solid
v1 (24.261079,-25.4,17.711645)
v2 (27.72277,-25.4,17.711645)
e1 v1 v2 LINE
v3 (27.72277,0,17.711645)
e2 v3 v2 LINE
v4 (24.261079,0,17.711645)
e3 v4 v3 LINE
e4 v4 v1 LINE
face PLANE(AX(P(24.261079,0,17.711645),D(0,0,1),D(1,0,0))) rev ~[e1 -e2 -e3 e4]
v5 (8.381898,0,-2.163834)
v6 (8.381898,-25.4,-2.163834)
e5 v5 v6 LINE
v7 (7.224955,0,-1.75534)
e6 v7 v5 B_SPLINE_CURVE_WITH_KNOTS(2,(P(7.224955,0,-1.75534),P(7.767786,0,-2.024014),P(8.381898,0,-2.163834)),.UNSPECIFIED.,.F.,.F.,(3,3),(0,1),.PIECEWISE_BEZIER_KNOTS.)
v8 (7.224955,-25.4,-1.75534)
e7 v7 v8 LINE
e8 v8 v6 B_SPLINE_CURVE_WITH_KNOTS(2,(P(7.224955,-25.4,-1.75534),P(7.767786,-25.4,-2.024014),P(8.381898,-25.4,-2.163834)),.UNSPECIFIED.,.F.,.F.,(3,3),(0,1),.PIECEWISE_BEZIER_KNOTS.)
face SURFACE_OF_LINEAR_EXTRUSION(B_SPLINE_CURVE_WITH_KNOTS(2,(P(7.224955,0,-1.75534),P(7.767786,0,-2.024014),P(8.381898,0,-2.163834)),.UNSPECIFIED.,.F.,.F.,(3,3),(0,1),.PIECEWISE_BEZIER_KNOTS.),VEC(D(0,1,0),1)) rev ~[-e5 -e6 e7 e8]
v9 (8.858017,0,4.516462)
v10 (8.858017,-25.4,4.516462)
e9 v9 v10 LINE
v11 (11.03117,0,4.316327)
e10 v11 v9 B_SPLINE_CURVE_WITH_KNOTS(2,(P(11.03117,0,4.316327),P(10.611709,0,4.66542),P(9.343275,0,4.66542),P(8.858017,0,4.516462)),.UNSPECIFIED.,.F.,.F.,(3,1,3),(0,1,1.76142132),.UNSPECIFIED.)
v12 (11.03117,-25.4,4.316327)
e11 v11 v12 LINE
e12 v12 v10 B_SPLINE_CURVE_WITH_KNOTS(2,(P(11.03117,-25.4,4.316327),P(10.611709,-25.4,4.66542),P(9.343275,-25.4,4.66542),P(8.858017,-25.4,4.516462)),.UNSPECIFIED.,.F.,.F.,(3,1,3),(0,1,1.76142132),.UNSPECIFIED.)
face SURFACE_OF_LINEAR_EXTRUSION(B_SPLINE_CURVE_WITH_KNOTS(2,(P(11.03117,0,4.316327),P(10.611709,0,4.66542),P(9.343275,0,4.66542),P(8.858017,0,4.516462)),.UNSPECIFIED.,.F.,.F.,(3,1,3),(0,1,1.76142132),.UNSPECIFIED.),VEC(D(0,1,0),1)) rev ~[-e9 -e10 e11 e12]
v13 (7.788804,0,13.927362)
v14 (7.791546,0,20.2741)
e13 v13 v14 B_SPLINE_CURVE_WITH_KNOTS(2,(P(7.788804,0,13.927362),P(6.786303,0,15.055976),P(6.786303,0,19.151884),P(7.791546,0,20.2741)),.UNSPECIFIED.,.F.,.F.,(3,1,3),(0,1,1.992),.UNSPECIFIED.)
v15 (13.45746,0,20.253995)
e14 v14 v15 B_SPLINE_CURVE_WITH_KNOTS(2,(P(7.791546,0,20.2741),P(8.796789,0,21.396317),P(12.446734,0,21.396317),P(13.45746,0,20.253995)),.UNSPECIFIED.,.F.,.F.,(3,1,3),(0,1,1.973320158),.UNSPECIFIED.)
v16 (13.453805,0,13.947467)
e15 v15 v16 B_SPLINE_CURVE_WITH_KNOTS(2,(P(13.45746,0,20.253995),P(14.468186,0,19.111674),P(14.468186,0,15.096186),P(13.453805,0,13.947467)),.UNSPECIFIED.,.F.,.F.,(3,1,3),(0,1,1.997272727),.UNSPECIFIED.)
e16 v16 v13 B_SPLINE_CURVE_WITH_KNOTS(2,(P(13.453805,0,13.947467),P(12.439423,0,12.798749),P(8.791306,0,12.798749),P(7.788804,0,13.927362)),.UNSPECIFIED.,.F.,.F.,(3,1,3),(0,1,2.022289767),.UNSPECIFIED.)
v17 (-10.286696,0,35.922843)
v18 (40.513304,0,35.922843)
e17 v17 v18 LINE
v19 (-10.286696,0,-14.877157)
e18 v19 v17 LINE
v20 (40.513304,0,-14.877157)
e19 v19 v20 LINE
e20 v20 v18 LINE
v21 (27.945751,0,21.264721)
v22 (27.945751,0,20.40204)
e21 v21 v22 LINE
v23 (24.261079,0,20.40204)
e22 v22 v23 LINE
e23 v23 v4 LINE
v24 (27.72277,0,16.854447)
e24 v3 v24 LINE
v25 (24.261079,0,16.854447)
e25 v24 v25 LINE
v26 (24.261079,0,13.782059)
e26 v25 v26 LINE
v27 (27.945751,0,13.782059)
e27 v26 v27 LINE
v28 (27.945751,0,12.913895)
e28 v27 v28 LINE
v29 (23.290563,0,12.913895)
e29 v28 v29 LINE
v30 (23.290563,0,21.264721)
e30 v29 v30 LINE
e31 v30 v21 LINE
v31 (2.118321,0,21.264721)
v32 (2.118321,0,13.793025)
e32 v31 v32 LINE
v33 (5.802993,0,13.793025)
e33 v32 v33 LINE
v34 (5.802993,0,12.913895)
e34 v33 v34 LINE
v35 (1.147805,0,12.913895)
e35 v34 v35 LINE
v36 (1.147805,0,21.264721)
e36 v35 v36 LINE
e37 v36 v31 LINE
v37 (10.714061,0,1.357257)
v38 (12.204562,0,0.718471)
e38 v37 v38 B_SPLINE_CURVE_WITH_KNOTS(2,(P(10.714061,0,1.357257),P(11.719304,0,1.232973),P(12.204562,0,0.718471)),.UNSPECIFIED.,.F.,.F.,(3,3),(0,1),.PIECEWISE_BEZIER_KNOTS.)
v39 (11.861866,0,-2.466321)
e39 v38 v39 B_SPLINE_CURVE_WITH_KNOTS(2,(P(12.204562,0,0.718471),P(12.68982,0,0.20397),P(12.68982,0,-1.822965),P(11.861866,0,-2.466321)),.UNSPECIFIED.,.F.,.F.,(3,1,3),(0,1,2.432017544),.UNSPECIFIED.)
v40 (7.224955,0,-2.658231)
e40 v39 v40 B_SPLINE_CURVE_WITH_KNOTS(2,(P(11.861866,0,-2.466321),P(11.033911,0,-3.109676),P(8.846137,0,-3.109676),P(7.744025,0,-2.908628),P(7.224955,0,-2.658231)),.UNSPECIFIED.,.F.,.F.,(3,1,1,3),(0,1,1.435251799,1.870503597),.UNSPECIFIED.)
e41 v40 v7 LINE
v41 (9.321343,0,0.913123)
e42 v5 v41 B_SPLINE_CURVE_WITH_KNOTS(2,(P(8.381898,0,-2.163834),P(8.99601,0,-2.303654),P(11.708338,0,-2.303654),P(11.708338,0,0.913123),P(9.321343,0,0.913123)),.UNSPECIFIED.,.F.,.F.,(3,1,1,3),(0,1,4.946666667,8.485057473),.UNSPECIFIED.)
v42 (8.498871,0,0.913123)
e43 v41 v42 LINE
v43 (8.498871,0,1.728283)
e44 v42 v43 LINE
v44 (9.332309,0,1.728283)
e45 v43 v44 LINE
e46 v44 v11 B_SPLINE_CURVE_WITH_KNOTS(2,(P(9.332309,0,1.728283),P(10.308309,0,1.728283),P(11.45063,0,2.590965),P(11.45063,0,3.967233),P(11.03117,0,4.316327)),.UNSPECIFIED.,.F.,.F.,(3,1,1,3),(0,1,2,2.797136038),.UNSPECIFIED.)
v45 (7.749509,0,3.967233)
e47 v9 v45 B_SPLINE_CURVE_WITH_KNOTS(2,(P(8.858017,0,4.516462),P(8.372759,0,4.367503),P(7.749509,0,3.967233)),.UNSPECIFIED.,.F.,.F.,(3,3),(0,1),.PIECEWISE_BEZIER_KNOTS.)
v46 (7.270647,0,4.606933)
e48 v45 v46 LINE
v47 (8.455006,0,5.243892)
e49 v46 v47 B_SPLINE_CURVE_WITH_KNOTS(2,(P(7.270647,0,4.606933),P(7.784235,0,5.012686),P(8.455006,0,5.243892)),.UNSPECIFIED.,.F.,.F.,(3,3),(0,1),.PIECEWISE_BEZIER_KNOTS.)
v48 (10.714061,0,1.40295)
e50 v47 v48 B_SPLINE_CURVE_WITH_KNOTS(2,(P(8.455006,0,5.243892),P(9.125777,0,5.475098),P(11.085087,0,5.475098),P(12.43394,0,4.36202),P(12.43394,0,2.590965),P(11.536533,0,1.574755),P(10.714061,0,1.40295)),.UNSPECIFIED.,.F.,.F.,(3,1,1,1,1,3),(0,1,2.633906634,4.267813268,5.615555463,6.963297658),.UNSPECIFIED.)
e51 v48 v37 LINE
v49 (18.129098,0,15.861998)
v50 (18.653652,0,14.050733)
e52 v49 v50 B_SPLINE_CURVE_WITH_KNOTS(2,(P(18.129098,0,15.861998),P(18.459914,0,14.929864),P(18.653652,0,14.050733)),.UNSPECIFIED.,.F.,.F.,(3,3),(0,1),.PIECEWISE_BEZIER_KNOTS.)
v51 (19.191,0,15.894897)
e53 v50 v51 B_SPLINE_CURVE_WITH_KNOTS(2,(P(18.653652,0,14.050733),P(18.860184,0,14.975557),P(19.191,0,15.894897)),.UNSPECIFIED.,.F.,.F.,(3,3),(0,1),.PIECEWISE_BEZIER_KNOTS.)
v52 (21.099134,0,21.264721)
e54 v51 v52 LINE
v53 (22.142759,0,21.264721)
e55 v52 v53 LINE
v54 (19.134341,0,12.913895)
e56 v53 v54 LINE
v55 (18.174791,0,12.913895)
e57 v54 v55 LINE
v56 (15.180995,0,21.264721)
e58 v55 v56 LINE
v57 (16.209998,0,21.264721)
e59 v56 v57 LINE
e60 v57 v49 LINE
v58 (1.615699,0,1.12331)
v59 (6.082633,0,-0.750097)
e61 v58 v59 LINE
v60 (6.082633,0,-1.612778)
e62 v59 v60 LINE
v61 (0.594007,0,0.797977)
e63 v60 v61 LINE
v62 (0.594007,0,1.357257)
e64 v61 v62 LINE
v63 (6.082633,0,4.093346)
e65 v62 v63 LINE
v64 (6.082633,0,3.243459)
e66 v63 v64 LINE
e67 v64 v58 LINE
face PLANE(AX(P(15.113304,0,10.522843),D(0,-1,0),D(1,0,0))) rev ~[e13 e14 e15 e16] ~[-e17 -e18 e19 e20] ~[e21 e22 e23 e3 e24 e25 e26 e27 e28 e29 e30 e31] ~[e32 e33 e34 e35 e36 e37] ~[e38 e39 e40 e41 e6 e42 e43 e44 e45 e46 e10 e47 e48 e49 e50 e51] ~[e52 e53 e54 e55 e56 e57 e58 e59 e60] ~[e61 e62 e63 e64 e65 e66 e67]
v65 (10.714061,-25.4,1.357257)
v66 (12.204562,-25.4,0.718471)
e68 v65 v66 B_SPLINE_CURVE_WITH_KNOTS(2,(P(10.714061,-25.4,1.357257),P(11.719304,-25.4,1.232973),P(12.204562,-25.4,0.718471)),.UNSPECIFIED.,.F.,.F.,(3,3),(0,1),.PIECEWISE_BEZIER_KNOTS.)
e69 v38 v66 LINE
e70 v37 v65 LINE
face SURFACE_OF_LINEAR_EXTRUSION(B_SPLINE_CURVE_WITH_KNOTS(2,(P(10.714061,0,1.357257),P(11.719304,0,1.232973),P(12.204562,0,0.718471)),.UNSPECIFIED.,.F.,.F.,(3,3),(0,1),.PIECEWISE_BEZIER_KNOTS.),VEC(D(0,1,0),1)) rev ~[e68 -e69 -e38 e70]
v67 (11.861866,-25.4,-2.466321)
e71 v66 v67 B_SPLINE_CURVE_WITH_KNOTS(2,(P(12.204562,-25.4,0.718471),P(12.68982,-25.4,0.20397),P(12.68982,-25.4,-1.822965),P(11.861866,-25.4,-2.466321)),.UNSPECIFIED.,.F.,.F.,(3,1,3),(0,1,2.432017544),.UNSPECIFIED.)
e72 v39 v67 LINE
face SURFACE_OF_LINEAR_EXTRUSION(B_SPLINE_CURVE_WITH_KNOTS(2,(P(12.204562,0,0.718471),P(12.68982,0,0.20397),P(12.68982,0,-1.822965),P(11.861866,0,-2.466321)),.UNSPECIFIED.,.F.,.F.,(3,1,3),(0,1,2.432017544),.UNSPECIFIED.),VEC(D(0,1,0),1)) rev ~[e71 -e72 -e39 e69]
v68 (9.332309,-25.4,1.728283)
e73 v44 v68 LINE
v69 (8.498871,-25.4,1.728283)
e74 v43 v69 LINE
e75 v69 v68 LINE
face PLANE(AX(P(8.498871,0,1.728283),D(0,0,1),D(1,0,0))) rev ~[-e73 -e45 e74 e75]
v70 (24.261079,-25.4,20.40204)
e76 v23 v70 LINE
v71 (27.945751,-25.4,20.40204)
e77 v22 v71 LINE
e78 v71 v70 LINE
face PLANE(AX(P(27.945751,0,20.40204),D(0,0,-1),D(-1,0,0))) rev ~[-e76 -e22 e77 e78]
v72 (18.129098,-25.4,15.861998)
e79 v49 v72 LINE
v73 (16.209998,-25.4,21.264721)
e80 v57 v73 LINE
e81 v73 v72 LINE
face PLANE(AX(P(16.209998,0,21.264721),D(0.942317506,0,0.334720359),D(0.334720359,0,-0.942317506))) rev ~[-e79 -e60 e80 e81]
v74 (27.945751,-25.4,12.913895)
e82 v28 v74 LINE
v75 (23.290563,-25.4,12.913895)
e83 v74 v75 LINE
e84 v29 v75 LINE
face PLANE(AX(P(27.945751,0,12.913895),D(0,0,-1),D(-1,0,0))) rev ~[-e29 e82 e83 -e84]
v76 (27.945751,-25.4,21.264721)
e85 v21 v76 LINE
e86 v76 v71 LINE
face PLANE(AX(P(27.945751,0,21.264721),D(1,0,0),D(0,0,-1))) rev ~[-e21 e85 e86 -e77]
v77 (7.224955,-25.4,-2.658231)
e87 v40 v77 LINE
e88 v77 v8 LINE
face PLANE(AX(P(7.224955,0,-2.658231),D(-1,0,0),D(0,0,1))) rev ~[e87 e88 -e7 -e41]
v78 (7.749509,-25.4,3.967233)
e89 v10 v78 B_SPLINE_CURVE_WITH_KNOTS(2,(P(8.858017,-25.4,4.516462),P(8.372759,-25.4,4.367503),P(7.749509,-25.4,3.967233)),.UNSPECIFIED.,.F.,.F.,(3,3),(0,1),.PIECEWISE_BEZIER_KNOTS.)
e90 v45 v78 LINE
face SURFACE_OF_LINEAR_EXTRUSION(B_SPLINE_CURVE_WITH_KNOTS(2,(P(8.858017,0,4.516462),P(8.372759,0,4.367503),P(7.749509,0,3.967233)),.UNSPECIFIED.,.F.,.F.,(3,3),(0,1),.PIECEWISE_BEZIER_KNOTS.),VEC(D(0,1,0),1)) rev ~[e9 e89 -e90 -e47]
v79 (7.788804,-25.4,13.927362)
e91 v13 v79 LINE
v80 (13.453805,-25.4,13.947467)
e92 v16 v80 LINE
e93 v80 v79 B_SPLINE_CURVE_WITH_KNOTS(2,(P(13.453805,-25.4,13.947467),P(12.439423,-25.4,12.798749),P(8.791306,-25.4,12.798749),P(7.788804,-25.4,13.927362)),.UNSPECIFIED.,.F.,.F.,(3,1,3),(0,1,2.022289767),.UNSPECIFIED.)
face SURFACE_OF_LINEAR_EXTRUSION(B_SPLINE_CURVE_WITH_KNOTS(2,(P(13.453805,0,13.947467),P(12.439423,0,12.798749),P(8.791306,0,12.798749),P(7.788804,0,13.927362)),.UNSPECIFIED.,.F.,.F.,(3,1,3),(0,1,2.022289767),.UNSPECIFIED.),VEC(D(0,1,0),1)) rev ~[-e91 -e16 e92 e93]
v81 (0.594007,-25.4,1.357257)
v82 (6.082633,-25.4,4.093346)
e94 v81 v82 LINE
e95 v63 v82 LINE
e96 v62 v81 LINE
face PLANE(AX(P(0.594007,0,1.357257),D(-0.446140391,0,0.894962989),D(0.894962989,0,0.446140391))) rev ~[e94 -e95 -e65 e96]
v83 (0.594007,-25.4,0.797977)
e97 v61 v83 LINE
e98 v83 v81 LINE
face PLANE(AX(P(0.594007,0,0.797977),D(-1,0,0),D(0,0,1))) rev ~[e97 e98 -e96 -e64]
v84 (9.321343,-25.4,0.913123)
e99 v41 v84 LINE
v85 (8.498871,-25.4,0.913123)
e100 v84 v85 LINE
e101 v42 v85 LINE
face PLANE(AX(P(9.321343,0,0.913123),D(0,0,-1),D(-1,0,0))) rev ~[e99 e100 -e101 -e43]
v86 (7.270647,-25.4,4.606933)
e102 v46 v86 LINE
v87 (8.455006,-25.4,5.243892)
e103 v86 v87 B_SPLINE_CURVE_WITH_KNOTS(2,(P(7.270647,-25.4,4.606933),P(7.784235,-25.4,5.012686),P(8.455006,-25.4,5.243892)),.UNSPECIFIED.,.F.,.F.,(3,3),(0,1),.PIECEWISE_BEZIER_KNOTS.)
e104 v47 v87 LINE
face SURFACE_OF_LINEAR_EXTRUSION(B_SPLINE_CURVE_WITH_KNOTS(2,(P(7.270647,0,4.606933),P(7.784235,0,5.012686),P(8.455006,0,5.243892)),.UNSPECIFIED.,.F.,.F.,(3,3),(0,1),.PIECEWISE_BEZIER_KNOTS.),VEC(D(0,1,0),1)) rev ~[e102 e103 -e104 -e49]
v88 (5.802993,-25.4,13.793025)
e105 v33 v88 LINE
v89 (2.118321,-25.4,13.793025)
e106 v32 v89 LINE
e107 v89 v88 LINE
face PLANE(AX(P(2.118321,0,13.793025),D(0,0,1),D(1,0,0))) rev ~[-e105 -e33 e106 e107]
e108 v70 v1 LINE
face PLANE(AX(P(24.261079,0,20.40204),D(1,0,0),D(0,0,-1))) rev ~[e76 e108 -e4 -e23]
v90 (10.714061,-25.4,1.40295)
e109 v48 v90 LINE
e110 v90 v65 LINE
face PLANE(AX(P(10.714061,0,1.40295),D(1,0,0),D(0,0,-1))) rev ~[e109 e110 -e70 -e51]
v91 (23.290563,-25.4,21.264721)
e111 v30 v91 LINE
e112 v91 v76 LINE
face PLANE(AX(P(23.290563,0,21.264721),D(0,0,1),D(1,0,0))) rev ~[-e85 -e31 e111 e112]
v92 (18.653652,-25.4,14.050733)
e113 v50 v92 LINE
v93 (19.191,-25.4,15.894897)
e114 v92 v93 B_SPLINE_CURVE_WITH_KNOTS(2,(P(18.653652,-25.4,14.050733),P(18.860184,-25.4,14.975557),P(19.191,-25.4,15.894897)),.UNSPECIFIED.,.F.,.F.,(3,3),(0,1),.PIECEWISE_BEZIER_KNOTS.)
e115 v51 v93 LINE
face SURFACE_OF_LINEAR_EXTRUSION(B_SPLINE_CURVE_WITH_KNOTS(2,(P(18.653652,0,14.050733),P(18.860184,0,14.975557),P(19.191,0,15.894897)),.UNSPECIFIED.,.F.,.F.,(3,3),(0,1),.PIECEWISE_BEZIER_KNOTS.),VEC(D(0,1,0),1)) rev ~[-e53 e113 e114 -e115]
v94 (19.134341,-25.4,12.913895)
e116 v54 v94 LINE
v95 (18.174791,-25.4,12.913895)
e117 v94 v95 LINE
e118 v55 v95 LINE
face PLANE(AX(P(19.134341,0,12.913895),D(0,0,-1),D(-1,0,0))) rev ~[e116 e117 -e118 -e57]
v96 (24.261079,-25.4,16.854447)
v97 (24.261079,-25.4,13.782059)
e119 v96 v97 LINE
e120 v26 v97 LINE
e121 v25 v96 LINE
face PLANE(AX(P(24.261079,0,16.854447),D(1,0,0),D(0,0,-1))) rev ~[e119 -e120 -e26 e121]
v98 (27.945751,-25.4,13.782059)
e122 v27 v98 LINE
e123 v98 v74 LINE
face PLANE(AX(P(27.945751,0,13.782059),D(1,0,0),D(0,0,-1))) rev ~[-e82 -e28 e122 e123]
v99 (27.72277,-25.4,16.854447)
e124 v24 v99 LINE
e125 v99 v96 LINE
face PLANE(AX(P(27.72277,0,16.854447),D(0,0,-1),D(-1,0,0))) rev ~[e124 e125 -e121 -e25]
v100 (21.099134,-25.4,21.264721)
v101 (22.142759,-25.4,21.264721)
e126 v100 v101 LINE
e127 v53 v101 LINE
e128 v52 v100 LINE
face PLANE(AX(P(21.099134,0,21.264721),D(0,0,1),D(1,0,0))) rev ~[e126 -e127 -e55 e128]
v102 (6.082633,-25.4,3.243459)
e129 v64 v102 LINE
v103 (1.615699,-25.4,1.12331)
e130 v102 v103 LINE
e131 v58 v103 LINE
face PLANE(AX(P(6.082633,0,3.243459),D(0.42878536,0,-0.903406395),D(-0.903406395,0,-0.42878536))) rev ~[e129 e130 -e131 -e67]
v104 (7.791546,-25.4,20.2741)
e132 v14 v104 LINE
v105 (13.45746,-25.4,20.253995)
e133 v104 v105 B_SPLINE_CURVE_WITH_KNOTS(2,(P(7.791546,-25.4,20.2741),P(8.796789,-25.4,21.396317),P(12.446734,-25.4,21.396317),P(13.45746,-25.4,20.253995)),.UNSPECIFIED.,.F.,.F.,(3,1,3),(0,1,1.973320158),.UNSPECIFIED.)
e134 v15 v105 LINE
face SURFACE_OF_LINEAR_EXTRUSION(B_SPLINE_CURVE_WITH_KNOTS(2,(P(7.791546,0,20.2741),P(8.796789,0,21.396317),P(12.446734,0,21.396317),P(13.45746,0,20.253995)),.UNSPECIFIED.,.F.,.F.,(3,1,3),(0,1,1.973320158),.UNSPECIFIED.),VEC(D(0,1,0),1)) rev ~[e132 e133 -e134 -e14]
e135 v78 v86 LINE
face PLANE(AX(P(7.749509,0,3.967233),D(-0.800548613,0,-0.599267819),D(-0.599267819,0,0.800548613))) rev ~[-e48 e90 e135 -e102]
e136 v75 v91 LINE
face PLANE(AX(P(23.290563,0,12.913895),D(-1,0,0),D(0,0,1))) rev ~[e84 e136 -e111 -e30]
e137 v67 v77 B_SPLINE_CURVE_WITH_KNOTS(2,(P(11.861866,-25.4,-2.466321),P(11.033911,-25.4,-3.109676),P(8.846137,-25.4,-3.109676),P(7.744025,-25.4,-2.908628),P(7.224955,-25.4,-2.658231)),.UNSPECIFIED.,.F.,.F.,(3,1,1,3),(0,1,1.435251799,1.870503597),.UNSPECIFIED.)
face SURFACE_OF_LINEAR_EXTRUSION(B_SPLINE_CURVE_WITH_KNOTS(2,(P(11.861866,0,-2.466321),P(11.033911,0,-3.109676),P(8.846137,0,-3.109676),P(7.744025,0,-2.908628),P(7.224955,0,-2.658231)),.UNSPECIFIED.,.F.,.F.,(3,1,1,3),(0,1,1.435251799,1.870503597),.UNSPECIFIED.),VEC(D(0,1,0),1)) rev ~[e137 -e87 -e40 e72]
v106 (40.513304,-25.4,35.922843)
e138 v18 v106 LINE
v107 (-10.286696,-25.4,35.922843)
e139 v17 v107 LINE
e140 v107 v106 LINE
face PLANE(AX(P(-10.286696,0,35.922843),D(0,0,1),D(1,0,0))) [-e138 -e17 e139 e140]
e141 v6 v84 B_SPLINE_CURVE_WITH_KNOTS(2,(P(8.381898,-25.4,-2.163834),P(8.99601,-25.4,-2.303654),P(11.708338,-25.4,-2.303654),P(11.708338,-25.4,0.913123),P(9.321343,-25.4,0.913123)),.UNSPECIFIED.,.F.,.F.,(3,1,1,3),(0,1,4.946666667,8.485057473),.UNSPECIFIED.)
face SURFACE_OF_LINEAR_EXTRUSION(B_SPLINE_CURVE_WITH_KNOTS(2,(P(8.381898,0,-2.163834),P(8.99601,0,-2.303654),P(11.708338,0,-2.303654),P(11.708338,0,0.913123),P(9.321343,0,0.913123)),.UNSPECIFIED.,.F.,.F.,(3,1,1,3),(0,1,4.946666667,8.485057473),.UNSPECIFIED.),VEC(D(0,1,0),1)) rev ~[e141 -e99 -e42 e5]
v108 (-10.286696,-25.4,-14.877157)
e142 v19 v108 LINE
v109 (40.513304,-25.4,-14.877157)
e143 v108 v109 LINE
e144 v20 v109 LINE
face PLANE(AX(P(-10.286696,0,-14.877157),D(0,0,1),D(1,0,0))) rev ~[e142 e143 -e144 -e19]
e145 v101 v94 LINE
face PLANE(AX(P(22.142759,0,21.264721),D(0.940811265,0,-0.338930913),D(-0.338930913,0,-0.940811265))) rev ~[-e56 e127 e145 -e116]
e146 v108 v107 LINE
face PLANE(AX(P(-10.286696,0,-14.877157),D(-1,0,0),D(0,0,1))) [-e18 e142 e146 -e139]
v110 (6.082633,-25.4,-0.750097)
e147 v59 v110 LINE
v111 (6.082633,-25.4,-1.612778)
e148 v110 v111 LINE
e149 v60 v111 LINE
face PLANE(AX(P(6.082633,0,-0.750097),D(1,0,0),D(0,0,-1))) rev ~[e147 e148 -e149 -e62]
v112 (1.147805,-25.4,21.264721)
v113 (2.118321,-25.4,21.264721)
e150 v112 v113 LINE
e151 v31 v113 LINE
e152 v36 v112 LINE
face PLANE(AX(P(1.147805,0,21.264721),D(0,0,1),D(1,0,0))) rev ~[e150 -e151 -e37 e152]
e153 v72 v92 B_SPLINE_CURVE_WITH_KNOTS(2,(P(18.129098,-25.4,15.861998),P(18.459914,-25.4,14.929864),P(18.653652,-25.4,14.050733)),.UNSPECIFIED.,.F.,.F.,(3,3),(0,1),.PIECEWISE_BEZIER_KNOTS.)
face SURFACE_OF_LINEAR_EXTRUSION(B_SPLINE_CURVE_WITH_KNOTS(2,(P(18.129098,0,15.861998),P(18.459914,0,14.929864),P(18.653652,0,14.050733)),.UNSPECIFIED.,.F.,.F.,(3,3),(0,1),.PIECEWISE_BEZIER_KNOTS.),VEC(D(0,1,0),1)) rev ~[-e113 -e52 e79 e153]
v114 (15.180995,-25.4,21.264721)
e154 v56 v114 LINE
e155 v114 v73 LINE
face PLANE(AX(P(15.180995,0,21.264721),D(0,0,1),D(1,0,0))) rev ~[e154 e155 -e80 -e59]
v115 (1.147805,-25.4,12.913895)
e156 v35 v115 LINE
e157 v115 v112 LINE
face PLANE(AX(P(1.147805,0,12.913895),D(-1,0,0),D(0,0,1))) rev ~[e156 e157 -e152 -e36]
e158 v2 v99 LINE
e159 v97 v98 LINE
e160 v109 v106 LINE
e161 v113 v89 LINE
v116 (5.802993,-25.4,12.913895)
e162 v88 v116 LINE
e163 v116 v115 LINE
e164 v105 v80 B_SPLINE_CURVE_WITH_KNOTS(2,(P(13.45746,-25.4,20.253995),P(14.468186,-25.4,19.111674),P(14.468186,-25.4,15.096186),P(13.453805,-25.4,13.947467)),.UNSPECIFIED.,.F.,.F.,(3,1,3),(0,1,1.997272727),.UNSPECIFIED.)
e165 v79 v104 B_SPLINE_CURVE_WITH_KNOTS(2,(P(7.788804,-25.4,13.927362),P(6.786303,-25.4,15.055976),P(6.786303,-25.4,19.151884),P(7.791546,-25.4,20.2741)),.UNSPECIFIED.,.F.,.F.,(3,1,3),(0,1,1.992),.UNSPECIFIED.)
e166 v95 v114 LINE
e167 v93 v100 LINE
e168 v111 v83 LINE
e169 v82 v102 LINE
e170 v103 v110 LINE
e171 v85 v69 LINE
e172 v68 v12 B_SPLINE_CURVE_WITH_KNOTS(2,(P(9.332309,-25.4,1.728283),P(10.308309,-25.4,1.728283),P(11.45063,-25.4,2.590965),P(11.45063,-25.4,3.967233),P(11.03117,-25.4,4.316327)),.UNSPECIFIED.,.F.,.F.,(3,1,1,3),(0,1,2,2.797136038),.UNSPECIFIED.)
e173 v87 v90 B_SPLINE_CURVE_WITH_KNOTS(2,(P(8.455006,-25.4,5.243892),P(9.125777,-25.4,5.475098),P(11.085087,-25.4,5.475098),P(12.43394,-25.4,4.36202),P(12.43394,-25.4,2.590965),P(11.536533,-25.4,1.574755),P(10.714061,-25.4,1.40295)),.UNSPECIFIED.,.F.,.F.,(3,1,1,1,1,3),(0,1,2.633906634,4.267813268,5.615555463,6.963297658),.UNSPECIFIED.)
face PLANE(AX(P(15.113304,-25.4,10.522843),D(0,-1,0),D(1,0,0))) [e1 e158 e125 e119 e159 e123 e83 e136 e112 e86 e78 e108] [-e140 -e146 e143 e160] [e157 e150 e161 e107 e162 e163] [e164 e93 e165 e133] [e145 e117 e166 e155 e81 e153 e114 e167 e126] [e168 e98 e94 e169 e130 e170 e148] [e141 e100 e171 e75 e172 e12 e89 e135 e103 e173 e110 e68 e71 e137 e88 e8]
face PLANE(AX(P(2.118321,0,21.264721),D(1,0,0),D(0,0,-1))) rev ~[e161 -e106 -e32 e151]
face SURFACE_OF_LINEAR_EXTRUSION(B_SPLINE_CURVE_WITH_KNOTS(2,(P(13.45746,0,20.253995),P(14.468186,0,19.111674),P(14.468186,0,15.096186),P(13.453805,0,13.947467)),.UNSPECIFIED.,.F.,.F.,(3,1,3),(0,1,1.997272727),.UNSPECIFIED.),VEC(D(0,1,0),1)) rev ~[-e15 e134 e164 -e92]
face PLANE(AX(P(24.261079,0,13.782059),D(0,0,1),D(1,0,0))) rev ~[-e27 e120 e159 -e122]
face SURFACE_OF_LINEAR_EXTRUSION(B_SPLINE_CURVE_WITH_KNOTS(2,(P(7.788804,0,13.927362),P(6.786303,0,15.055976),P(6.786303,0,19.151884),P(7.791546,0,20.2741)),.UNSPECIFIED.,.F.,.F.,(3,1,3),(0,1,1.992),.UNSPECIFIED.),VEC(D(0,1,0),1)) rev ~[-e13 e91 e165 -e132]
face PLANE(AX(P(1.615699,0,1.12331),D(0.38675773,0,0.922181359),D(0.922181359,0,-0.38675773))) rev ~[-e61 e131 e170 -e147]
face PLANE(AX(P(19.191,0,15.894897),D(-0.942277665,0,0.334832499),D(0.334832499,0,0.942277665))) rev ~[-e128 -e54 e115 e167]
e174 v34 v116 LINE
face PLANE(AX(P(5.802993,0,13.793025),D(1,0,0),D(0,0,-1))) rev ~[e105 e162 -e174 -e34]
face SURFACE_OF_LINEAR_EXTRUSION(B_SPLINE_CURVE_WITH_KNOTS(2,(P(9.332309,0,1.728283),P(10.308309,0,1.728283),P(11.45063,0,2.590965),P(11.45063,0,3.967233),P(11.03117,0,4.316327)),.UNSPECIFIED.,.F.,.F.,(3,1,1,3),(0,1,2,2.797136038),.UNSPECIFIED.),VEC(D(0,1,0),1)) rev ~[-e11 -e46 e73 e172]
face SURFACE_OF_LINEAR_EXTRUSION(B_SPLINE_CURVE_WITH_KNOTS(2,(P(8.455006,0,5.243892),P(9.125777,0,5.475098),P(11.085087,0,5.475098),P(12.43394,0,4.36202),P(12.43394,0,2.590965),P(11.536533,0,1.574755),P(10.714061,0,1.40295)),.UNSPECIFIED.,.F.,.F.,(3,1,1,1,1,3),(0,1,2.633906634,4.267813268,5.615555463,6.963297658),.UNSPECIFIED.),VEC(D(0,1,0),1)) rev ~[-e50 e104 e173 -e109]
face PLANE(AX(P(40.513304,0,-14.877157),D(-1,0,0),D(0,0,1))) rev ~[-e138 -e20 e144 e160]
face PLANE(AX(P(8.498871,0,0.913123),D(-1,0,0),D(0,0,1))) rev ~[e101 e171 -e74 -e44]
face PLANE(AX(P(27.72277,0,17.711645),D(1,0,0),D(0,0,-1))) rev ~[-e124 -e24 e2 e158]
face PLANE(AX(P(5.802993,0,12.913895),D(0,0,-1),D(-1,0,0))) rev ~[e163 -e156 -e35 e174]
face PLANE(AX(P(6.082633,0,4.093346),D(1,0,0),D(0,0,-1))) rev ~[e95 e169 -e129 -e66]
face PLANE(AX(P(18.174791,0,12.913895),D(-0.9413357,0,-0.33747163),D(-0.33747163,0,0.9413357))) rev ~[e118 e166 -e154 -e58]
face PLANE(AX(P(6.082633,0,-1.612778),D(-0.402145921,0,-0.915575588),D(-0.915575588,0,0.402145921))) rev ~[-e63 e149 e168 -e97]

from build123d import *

# Parameters (mm, degrees)
F0_W     = 50.8
F0_H     = 50.8
F1_DEPTH = 25.4


with BuildPart() as f1:
    # F0 (on Front) → F1 (new body)
    with BuildSketch(Plane.XZ):
        with Locations((15.1133043692, 10.5228427142)):
            Rectangle(F0_W, F0_H)
        Polygon((6.0826331481, -0.7500971721), (6.0826331481, -1.6127783157), (0.5940071434, 0.7979768292), (0.5940071434, 1.3572574011), (6.0826331481, 4.0933456892), (6.0826331481, 3.2434585456), (1.61569943, 1.1233099724), align=None, mode=Mode.SUBTRACT)
        with BuildLine():
            add(Edge.make_bspline(
                [(11.7595137243, 4.9185586899), (12.4339402963, 4.3620196894), (12.4339402963, 3.3915034029)],
                knots=[0, 0, 0, 1, 1, 1], degree=2))
            add(Edge.make_bspline(
                [(12.4339402963, 3.3915034029), (12.4339402963, 2.5909645451), (11.9852364388, 2.0828599732)],
                knots=[0, 0, 0, 1, 1, 1], degree=2))
            add(Edge.make_bspline(
                [(11.9852364388, 2.0828599732), (11.5365325813, 1.5747554013), (10.714061152, 1.4029502583)],
                knots=[0, 0, 0, 1, 1, 1], degree=2))
            Line((10.714061152, 1.4029502583), (10.714061152, 1.3572574011))
            add(Edge.make_bspline(
                [(10.714061152, 1.3572574011), (11.71930401, 1.2329728296), (12.2045621533, 0.7184712577)],
                knots=[0, 0, 0, 1, 1, 1], degree=2))
            add(Edge.make_bspline(
                [(12.2045621533, 0.7184712577), (12.6898202965, 0.2039696859), (12.6898202965, -0.6294680291)],
                knots=[0, 0, 0, 1, 1, 1], degree=2))
            add(Edge.make_bspline(
                [(12.6898202965, -0.6294680291), (12.6898202965, -1.8229654587), (11.8618657244, -2.4663208878)],
                knots=[0, 0, 0, 1, 1, 1], degree=2))
            add(Edge.make_bspline(
                [(11.8618657244, -2.4663208878), (11.0339111523, -3.109676317), (9.5095974367, -3.109676317)],
                knots=[0, 0, 0, 1, 1, 1], degree=2))
            add(Edge.make_bspline(
                [(9.5095974367, -3.109676317), (8.8461371504, -3.109676317), (8.2950812928, -3.0091520312)],
                knots=[0, 0, 0, 1, 1, 1], degree=2))
            add(Edge.make_bspline(
                [(8.2950812928, -3.0091520312), (7.7440254352, -2.9086277454), (7.2249545776, -2.658230888)],
                knots=[0, 0, 0, 1, 1, 1], degree=2))
            Line((7.2249545776, -2.658230888), (7.2249545776, -1.7553400301))
            add(Edge.make_bspline(
                [(7.2249545776, -1.7553400301), (7.7677857209, -2.0240140303), (8.3818977214, -2.1638341733)],
                knots=[0, 0, 0, 1, 1, 1], degree=2))
            add(Edge.make_bspline(
                [(8.3818977214, -2.1638341733), (8.996009722, -2.3036543163), (9.5443240081, -2.3036543163)],
                knots=[0, 0, 0, 1, 1, 1], degree=2))
            add(Edge.make_bspline(
                [(9.5443240081, -2.3036543163), (11.7083377243, -2.3036543163), (11.7083377243, -0.6075354577)],
                knots=[0, 0, 0, 1, 1, 1], degree=2))
            add(Edge.make_bspline(
                [(11.7083377243, -0.6075354577), (11.7083377243, 0.9131228293), (9.3213428651, 0.9131228293)],
                knots=[0, 0, 0, 1, 1, 1], degree=2))
            Line((9.3213428651, 0.9131228293), (8.4988714358, 0.9131228293))
            Line((8.4988714358, 0.9131228293), (8.4988714358, 1.7282834015))
            Line((8.4988714358, 1.7282834015), (9.3323091508, 1.7282834015))
            add(Edge.make_bspline(
                [(9.3323091508, 1.7282834015), (10.3083085802, 1.7282834015), (10.879469295, 2.1596239733)],
                knots=[0, 0, 0, 1, 1, 1], degree=2))
            add(Edge.make_bspline(
                [(10.879469295, 2.1596239733), (11.4506300098, 2.5909645451), (11.4506300098, 3.3567768314)],
                knots=[0, 0, 0, 1, 1, 1], degree=2))
            add(Edge.make_bspline(
                [(11.4506300098, 3.3567768314), (11.4506300098, 3.9672334034), (11.0311695808, 4.3163268322)],
                knots=[0, 0, 0, 1, 1, 1], degree=2))
            add(Edge.make_bspline(
                [(11.0311695808, 4.3163268322), (10.6117091519, 4.6654202611), (9.8915897227, 4.6654202611)],
                knots=[0, 0, 0, 1, 1, 1], degree=2))
            add(Edge.make_bspline(
                [(9.8915897227, 4.6654202611), (9.3432754365, 4.6654202611), (8.8580172933, 4.5164615467)],
                knots=[0, 0, 0, 1, 1, 1], degree=2))
            add(Edge.make_bspline(
                [(8.8580172933, 4.5164615467), (8.37275915, 4.3675028323), (7.749508578, 3.9672334034)],
                knots=[0, 0, 0, 1, 1, 1], degree=2))
            Line((7.749508578, 3.9672334034), (7.2706474348, 4.6069334039))
            add(Edge.make_bspline(
                [(7.2706474348, 4.6069334039), (7.7842351495, 5.0126859757), (8.4550062929, 5.243891833)],
                knots=[0, 0, 0, 1, 1, 1], degree=2))
            add(Edge.make_bspline(
                [(8.4550062929, 5.243891833), (9.1257774364, 5.4750976904), (9.8696571513, 5.4750976904)],
                knots=[0, 0, 0, 1, 1, 1], degree=2))
            add(Edge.make_bspline(
                [(9.8696571513, 5.4750976904), (11.0850871523, 5.4750976904), (11.7595137243, 4.9185586899)],
                knots=[0, 0, 0, 1, 1, 1], degree=2))
        make_face(mode=Mode.SUBTRACT)
        Polygon((5.8029928621, 12.9138948396), (1.1478045724, 12.9138948396), (1.1478045724, 21.2647214181), (2.118320859, 21.2647214181), (2.118320859, 13.7930254118), (5.8029928621, 13.7930254118), align=None, mode=Mode.SUBTRACT)
        with BuildLine():
            add(Edge.make_bspline(
                [(13.4574602972, 20.2539954173), (14.4681862981, 19.1116739877), (14.4681862981, 17.1011882717)],
                knots=[0, 0, 0, 1, 1, 1], degree=2))
            add(Edge.make_bspline(
                [(14.4681862981, 17.1011882717), (14.4681862981, 15.0961856986), (13.4538048686, 13.947467269)],
                knots=[0, 0, 0, 1, 1, 1], degree=2))
            add(Edge.make_bspline(
                [(13.4538048686, 13.947467269), (12.4394234392, 12.7987488395), (10.6354694377, 12.7987488395)],
                knots=[0, 0, 0, 1, 1, 1], degree=2))
            add(Edge.make_bspline(
                [(10.6354694377, 12.7987488395), (8.7913057218, 12.7987488395), (7.7888044352, 13.9273624119)],
                knots=[0, 0, 0, 1, 1, 1], degree=2))
            add(Edge.make_bspline(
                [(7.7888044352, 13.9273624119), (6.7863031487, 15.0559759843), (6.7863031487, 17.1121545575)],
                knots=[0, 0, 0, 1, 1, 1], degree=2))
            add(Edge.make_bspline(
                [(6.7863031487, 17.1121545575), (6.7863031487, 19.1518837021), (7.7915460067, 20.2741002744)],
                knots=[0, 0, 0, 1, 1, 1], degree=2))
            add(Edge.make_bspline(
                [(7.7915460067, 20.2741002744), (8.7967888647, 21.3963168468), (10.6464357234, 21.3963168468)],
                knots=[0, 0, 0, 1, 1, 1], degree=2))
            add(Edge.make_bspline(
                [(10.6464357234, 21.3963168468), (12.4467342963, 21.3963168468), (13.4574602972, 20.2539954173)],
                knots=[0, 0, 0, 1, 1, 1], degree=2))
        make_face(mode=Mode.SUBTRACT)
        with BuildLine():
            Line((19.1910000164, 15.8948968421), (21.0991337323, 21.2647214181))
            Line((21.0991337323, 21.2647214181), (22.1427585903, 21.2647214181))
            Line((22.1427585903, 21.2647214181), (19.1343408735, 12.9138948396))
            Line((19.1343408735, 12.9138948396), (18.1747908727, 12.9138948396))
            Line((18.1747908727, 12.9138948396), (15.1809948701, 21.2647214181))
            Line((15.1809948701, 21.2647214181), (16.2099980138, 21.2647214181))
            Line((16.2099980138, 21.2647214181), (18.1290980155, 15.861997985))
            add(Edge.make_bspline(
                [(18.1290980155, 15.861997985), (18.4599143015, 14.9298636984), (18.6536520159, 14.0507331263)],
                knots=[0, 0, 0, 1, 1, 1], degree=2))
            add(Edge.make_bspline(
                [(18.6536520159, 14.0507331263), (18.8601837304, 14.9755565556), (19.1910000164, 15.8948968421)],
                knots=[0, 0, 0, 1, 1, 1], degree=2))
        make_face(mode=Mode.SUBTRACT)
        Polygon((27.9457514524, 13.782059126), (27.9457514524, 12.9138948396), (23.2905631627, 12.9138948396), (23.2905631627, 21.2647214181), (27.9457514524, 21.2647214181), (27.9457514524, 20.4020402746), (24.2610794493, 20.4020402746), (24.2610794493, 17.7116448437), (27.7227703094, 17.7116448437), (27.7227703094, 16.8544468429), (24.2610794493, 16.8544468429), (24.2610794493, 13.782059126), align=None, mode=Mode.SUBTRACT)
    extrude(amount=F1_DEPTH)


solid = f1.part
